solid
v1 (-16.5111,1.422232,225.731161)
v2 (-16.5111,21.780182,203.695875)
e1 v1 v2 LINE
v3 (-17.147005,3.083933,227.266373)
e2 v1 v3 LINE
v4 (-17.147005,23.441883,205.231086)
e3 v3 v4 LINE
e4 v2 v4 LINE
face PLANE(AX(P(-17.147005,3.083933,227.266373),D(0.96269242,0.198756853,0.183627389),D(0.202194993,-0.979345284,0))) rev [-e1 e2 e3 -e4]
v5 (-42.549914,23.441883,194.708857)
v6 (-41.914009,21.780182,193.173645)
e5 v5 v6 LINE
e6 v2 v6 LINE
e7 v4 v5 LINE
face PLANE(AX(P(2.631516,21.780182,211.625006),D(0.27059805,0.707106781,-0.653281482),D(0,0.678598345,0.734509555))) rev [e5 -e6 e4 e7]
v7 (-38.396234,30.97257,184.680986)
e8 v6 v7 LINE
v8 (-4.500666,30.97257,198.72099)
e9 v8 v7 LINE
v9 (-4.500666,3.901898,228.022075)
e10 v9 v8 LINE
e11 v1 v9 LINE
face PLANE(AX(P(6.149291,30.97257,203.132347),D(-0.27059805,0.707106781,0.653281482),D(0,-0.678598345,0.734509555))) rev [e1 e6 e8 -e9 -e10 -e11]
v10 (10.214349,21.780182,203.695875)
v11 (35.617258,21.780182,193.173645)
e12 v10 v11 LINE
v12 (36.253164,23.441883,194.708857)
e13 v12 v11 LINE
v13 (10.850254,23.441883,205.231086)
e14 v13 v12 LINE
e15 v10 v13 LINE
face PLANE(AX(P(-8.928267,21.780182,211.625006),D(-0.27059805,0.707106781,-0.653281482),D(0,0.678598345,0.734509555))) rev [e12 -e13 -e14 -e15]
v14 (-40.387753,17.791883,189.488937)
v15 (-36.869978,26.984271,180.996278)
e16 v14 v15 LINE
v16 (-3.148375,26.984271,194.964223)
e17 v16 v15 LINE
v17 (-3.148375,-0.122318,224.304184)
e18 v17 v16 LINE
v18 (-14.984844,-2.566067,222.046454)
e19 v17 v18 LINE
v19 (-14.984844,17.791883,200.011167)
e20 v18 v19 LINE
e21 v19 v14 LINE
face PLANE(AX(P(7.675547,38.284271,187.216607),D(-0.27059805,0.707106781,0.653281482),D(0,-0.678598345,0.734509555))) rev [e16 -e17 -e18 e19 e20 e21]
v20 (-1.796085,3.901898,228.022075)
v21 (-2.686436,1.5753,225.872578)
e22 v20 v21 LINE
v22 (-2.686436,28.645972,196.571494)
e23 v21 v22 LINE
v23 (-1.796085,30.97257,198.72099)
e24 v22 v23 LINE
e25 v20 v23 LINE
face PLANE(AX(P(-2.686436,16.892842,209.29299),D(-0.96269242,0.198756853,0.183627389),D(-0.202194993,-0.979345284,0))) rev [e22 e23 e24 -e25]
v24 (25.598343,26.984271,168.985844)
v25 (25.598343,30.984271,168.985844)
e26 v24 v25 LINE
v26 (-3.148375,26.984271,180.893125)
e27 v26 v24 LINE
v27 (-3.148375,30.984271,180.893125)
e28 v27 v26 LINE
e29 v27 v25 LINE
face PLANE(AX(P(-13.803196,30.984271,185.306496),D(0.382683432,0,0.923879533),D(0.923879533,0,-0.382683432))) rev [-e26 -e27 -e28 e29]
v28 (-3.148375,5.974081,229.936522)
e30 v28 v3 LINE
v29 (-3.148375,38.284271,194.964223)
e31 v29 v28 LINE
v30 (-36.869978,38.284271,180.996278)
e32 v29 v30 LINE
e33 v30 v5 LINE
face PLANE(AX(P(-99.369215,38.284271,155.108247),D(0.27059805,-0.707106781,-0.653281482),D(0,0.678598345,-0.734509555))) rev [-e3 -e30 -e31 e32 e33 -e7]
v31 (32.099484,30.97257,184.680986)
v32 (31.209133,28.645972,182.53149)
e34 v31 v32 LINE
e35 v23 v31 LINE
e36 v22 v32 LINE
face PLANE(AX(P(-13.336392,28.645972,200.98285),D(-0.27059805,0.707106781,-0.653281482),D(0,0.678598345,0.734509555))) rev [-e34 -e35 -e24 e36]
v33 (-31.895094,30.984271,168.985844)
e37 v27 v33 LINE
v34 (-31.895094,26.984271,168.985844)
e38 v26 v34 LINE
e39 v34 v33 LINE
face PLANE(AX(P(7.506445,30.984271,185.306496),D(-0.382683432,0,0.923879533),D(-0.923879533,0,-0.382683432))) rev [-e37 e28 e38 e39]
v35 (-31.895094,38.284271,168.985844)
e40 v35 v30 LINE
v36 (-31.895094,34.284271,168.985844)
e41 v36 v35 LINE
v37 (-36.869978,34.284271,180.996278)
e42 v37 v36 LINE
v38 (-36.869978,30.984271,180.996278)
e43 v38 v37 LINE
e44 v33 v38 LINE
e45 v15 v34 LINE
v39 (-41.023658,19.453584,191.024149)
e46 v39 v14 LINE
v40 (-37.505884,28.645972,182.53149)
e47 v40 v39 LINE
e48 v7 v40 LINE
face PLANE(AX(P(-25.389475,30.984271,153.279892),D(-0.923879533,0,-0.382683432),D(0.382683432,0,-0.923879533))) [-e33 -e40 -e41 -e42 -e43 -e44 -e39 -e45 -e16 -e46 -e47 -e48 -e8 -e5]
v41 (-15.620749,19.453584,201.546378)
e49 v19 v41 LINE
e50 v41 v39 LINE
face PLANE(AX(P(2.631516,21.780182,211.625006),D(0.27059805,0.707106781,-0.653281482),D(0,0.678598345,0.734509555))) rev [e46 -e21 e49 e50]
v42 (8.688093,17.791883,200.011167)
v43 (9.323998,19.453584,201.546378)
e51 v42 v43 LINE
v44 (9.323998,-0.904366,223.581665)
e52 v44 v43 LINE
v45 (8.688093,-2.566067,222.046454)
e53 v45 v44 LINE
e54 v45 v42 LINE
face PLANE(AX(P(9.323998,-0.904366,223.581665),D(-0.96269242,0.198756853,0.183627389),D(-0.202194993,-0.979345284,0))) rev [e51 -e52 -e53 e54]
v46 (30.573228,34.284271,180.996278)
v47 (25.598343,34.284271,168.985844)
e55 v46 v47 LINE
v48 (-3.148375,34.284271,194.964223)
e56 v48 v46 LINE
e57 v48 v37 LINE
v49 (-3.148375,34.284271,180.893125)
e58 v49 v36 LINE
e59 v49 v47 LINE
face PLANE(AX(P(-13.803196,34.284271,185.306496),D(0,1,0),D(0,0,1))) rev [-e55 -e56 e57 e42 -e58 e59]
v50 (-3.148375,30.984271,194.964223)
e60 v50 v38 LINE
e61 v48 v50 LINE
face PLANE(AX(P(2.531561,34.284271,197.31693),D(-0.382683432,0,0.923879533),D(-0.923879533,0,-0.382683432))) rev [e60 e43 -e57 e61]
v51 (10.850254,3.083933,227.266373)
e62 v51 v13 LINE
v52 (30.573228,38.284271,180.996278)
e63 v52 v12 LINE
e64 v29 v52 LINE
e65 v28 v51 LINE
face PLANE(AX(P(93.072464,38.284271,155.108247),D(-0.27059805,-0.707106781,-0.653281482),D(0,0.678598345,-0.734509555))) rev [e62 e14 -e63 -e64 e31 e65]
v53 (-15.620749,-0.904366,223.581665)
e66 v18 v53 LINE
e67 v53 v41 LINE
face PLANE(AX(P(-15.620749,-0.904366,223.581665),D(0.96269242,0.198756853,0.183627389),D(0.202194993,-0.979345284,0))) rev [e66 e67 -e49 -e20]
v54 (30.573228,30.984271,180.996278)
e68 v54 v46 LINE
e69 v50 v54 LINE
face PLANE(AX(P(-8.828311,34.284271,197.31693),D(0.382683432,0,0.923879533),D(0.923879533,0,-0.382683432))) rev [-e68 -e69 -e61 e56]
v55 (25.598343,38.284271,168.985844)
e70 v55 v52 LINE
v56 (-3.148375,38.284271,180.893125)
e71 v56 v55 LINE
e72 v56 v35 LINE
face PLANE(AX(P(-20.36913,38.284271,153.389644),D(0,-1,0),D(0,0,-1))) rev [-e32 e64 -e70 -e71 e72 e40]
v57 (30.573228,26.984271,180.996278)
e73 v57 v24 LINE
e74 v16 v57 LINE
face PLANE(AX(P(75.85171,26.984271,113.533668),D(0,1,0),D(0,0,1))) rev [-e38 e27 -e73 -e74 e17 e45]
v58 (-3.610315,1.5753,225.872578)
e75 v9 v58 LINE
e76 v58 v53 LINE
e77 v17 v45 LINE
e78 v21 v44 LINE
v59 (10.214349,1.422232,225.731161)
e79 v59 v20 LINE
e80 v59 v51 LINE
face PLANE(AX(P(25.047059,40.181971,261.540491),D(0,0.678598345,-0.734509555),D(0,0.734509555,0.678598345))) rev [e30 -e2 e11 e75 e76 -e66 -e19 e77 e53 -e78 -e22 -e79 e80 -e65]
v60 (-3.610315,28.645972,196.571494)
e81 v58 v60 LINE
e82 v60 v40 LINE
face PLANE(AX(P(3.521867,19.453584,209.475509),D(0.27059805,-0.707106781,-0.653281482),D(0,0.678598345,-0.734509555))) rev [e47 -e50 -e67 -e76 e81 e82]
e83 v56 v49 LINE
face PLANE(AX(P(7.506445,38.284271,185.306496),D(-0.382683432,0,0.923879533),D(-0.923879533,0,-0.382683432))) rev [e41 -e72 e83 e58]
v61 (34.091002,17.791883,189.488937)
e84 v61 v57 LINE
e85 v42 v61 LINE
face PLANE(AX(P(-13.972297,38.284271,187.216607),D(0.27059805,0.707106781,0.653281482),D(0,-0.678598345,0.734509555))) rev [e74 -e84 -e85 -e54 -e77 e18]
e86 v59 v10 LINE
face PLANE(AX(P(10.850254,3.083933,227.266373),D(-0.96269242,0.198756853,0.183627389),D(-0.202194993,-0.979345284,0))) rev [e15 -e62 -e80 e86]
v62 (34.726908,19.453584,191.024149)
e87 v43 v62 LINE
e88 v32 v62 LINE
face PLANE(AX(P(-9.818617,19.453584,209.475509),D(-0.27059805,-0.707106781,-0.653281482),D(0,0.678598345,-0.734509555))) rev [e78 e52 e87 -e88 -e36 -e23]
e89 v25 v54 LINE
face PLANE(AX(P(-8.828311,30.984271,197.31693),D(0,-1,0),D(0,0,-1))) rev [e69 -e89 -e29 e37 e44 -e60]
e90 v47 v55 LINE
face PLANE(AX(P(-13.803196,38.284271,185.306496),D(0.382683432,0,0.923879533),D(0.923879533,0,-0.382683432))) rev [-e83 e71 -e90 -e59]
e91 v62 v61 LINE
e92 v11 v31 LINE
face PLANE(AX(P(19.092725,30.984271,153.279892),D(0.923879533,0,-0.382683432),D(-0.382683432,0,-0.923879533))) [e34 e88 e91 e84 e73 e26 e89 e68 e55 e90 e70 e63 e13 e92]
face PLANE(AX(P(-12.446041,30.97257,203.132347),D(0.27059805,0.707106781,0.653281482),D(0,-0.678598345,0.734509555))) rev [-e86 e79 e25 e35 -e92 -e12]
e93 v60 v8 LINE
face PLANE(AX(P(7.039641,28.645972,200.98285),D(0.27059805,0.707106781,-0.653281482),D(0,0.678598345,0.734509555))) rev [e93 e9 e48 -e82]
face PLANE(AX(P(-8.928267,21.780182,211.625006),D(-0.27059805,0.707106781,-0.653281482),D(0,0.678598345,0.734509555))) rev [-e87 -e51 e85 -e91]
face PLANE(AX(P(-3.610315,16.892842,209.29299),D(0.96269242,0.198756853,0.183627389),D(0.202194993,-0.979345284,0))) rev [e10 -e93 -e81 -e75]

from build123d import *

# Parameters (mm, degrees)
SKETCH1_W                = 214.089522673
SKETCH1_H                = 271.033566845
BOSS_EXTRUDE1_DEPTH      = 10
SKETCH3_W                = 107.044761337
SKETCH3_H                = 271.033566845
CUT_EXTRUDE1_DEPTH       = 252.253590179
CUT_EXTRUDE2_DEPTH       = 249.55642867
BOSS_EXTRUDE3_DEPTH      = 40
CUT_EXTRUDE3_START       = -165.689856025
CUT_EXTRUDE3_DEPTH       = 205.862728092
CUT_EXTRUDE4_DEPTH       = 250.960593361
CUT_EXTRUDE5_DEPTH       = 250.960593361
CUT_EXTRUDE11_DEPTH      = 252.67545035
SKETCH26_W               = 104.148686
SKETCH26_H               = 11.3
BOSS_EXTRUDE7_DEPTH      = 45
CUT_EXTRUDE12_DEPTH      = 250.816831154
CUT_EXTRUDE13_DEPTH      = 252.67545035
CUT_EXTRUDE14_DEPTH      = 237.436663672
BOSS_EXTRUDE8_DEPTH      = 13.546139965
BOSS_EXTRUDE9_DEPTH      = 30
CUT_EXTRUDE16_DEPTH      = 184.540545695
CUT_EXTRUDE17_DEPTH      = 30
CUT_EXTRUDE17_DEPTH_BACK = 30


with BuildPart() as part:
    # Sketch1 → Boss-Extrude1 (new body)
    with BuildSketch(Plane(origin=(0, 0, 0), x_dir=(1, 0, 0), z_dir=(0, 1, 0))):
        with Locations((-3.148375333, -90.062114546)):
            Rectangle(SKETCH1_W, SKETCH1_H)
    extrude(amount=BOSS_EXTRUDE1_DEPTH)

    # Sketch3 → Cut-Extrude1 (cut, through all)
    with BuildSketch(Plane(origin=(0, 10, 0), x_dir=(1, 0, 0), z_dir=(0, 1, 0))):
        with Locations((-56.670756002, -90.062114546)):
            Rectangle(SKETCH3_W, SKETCH3_H)
    extrude(amount=-CUT_EXTRUDE1_DEPTH, mode=Mode.SUBTRACT)

    # Sketch4 → Cut-Extrude2 (cut, through all)
    with BuildSketch(Plane(origin=(0, 10, 0), x_dir=(1, 0, 0), z_dir=(0, 1, 0))):
        Polygon((103.896386003, -181.239506042), (100.834918545, -173.848469781), (9.996584241, 45.454668877), (103.896386003, 45.454668877), align=None)
    extrude(amount=-CUT_EXTRUDE2_DEPTH, mode=Mode.SUBTRACT)

    # Sketch6 → Boss-Extrude3 (add, along a direction that is not the sketch's normal)
    with BuildSketch(Plane(origin=(0, 10, 0), x_dir=(1, 0, 0), z_dir=(0, 1, 0))):
        Polygon((99.572063218, -170.799667324), (103.896386003, -181.239506042), (-3.148375333, -225.578897968), (-3.148375333, -213.347866105), align=None)
    extrude(amount=BOSS_EXTRUDE3_DEPTH, dir=(-0.2705980500730979, 0.7071067811865489, -0.6532814824381872))

    # Cut-Extrude3: read off the stored shape, not the designer's step
    # Cut-Extrude3 outline → Cut-Extrude3 (cut)
    with BuildSketch(Plane(origin=(0, 0, 0), x_dir=(1, 0, 0), z_dir=(0, 0.6785983445458481, -0.7345095552677544)).offset(CUT_EXTRUDE3_START)):
        Polygon((-3.148375333, -165), (-3.148375333, -152.122604304), (-13.972297336, -155.165042499), (-15, -155.45391393), (-15, -165), align=None)
    extrude(amount=CUT_EXTRUDE3_DEPTH, mode=Mode.SUBTRACT)

    # Sketch8 → Cut-Extrude4 (cut, through all)
    with BuildSketch(Plane(origin=(0, 10, 0), x_dir=(1, 0, 0), z_dir=(0, 1, 0))):
        Polygon((-3.148375333, -225.578897968), (103.896386003, -181.239506042), (103.896386003, -225.578897968), align=None)
    extrude(amount=-CUT_EXTRUDE4_DEPTH, mode=Mode.SUBTRACT)

    # Sketch9 → Cut-Extrude5 (cut, through all)
    with BuildSketch(Plane(origin=(0, 10, 0), x_dir=(1, 0, 0), z_dir=(0, 1, 0))):
        Polygon((-3.148375333, -213.347866105), (99.572063218, -170.799667324), (9.996584241, 45.454668877), (-3.148375333, 45.454668877), align=None)
    extrude(amount=-CUT_EXTRUDE5_DEPTH, mode=Mode.SUBTRACT)

    # Sketch25 → Cut-Extrude11 (cut, through all)
    with BuildSketch(Plane(origin=(24.603270673, 0, -10.191008392), x_dir=(-0.38268343236508967, 0, -0.9238795325112868), z_dir=(0.9238795325112867, 0, -0.3826834323650896))):
        Polygon((-178.918624473, 38.284271247), (-178.918624473, 26.984271247), (-167.618624473, 38.284271247), align=None)
    extrude(amount=-CUT_EXTRUDE11_DEPTH, mode=Mode.SUBTRACT)

    # Sketch26 → Boss-Extrude7 (add)
    with BuildSketch(Plane(origin=(68.469193327, 0, 165.299255136), x_dir=(-0.9238795325112868, 0, 0.3826834323650896), z_dir=(-0.38268343236508956, 0, -0.9238795325112867))):
        with Locations((25.443954722, 32.634271247)):
            Rectangle(SKETCH26_W, SKETCH26_H)
    extrude(amount=BOSS_EXTRUDE7_DEPTH)

    # Sketch27 → Cut-Extrude12 (cut, through all)
    with BuildSketch(Plane.XZ.offset(-26.984271247)):
        Polygon((-3.148375333, 194.964223379), (-3.148375333, 146.256574366), (-20.36912979, 153.389644416), align=None)
    extrude(amount=-CUT_EXTRUDE12_DEPTH, mode=Mode.SUBTRACT)

    # Sketch29 → Cut-Extrude13 (cut, through all)
    with BuildSketch(Plane(origin=(24.603270673, 0, -10.191008392), x_dir=(-0.38268343236508967, 0, -0.9238795325112868), z_dir=(0.9238795325112867, 0, -0.3826834323650896))):
        Polygon((-188.111012628, 17.791883092), (-189.772713564, 19.453584028), (-180.580325409, 28.645972183), (-182.906923537, 30.972570312), (-192.099311693, 21.780182156), (-193.761012628, 23.441883092), (-207.20289572, 10), (-207.20289572, 0), (-195.90289572, 0), (-195.90289572, 10), align=None)
    extrude(amount=-CUT_EXTRUDE13_DEPTH, mode=Mode.SUBTRACT)

    # Sketch31 → Cut-Extrude14 (cut, through all)
    with BuildSketch(Plane(origin=(24.603270673, 0, -10.191008392), x_dir=(-0.38268343236508967, 0, -0.9238795325112868), z_dir=(0.9238795325112867, 0, -0.3826834323650896))):
        Polygon((-133.918624473, 38.284271247), (-165.918624473, 38.284271247), (-165.918624473, 34.284271247), (-178.918624473, 34.284271247), (-178.918624473, 30.984271247), (-165.918624473, 30.984271247), (-165.918624473, 26.984271247), (-133.918624473, 26.984271247), align=None)
    extrude(amount=-CUT_EXTRUDE14_DEPTH, mode=Mode.SUBTRACT)

    # Sketch32 → Boss-Extrude8 (add, along a direction that is not the sketch's normal)
    with BuildSketch(Plane(origin=(29.071379893, -75.967176613, 70.184519615), x_dir=(-0.9626924198811577, -0.19875685341551308, 0.18362738881693294), z_dir=(0.27059805007309423, -0.7071067811865585, 0.6532814824381782))):
        Polygon((33.468379475, -163.963292106), (32.988537984, -163.822749787), (32.063683338, -166.980401064), (33.468379475, -167.391827037), align=None)
    extrude(amount=BOSS_EXTRUDE8_DEPTH, dir=(0, -0.6785983445458523, 0.7345095552677506))

    # Sketch33 → Boss-Extrude9 (add, along a direction that is not the sketch's normal)
    with BuildSketch(Plane(origin=(32.589154544, -85.159564768, 78.677178887), x_dir=(-0.962692419881157, -0.19875685341551325, 0.1836273888169371), z_dir=(0.2705980500730972, -0.7071067811865508, 0.6532814824381854))):
        Polygon((36.642638275, -164.893010983), (24.166759505, -161.238910693), (24.827308404, -158.983655684), (37.122479766, -162.584828001), (37.122479766, -170.910813534), (22.58135596, -166.651816978), (23.241904859, -164.39656197), (35.717783628, -168.05066226), align=None)
    extrude(amount=BOSS_EXTRUDE9_DEPTH, dir=(0, -0.6785983445458483, 0.7345095552677544))

    # Sketch35 → Cut-Extrude16 (cut, through all)
    with BuildSketch(Plane(origin=(39.397813434, 102.95144786, 95.11473552), x_dir=(-0.9626924198811563, 0.19875685341551394, 0.18362738881693996), z_dir=(-0.2705980500730996, -0.7071067811865461, -0.6532814824381894))):
        Polygon((31.899825803, -164.836570859), (46.839732684, -164.836570859), (46.839732684, -169.212368274), (44.194997165, -168.437743175), align=None)
    extrude(amount=-CUT_EXTRUDE16_DEPTH, mode=Mode.SUBTRACT)

    # Sketch37 → Cut-Extrude17 (cut, two sides: drawn at the far end of the back side and taken through both)
    with BuildSketch(Plane(origin=(68.469193327, 0, 165.299255136), x_dir=(-0.9238795325112868, 0, 0.3826834323650897), z_dir=(-0.38268343236508967, 0, -0.9238795325112867)).offset(-CUT_EXTRUDE17_DEPTH_BACK)):
        Polygon((41.018297722, 30.984271247), (41.018297722, 53.15222912), (-28.644246397, 53.15222912), (-28.644246397, 4.37720767), (41.018297722, 4.37720767), align=None)
    extrude(amount=CUT_EXTRUDE17_DEPTH + CUT_EXTRUDE17_DEPTH_BACK, mode=Mode.SUBTRACT)

    # Mirror2: part across plane


with BuildPart() as part_1:
    add(part.part)
    add(part.part.mirror(Plane(origin=(-3.148375333, 0, 225.578897968), x_dir=(0, 0, 1), z_dir=(1, 0, 0))))


solid = part_1.part
